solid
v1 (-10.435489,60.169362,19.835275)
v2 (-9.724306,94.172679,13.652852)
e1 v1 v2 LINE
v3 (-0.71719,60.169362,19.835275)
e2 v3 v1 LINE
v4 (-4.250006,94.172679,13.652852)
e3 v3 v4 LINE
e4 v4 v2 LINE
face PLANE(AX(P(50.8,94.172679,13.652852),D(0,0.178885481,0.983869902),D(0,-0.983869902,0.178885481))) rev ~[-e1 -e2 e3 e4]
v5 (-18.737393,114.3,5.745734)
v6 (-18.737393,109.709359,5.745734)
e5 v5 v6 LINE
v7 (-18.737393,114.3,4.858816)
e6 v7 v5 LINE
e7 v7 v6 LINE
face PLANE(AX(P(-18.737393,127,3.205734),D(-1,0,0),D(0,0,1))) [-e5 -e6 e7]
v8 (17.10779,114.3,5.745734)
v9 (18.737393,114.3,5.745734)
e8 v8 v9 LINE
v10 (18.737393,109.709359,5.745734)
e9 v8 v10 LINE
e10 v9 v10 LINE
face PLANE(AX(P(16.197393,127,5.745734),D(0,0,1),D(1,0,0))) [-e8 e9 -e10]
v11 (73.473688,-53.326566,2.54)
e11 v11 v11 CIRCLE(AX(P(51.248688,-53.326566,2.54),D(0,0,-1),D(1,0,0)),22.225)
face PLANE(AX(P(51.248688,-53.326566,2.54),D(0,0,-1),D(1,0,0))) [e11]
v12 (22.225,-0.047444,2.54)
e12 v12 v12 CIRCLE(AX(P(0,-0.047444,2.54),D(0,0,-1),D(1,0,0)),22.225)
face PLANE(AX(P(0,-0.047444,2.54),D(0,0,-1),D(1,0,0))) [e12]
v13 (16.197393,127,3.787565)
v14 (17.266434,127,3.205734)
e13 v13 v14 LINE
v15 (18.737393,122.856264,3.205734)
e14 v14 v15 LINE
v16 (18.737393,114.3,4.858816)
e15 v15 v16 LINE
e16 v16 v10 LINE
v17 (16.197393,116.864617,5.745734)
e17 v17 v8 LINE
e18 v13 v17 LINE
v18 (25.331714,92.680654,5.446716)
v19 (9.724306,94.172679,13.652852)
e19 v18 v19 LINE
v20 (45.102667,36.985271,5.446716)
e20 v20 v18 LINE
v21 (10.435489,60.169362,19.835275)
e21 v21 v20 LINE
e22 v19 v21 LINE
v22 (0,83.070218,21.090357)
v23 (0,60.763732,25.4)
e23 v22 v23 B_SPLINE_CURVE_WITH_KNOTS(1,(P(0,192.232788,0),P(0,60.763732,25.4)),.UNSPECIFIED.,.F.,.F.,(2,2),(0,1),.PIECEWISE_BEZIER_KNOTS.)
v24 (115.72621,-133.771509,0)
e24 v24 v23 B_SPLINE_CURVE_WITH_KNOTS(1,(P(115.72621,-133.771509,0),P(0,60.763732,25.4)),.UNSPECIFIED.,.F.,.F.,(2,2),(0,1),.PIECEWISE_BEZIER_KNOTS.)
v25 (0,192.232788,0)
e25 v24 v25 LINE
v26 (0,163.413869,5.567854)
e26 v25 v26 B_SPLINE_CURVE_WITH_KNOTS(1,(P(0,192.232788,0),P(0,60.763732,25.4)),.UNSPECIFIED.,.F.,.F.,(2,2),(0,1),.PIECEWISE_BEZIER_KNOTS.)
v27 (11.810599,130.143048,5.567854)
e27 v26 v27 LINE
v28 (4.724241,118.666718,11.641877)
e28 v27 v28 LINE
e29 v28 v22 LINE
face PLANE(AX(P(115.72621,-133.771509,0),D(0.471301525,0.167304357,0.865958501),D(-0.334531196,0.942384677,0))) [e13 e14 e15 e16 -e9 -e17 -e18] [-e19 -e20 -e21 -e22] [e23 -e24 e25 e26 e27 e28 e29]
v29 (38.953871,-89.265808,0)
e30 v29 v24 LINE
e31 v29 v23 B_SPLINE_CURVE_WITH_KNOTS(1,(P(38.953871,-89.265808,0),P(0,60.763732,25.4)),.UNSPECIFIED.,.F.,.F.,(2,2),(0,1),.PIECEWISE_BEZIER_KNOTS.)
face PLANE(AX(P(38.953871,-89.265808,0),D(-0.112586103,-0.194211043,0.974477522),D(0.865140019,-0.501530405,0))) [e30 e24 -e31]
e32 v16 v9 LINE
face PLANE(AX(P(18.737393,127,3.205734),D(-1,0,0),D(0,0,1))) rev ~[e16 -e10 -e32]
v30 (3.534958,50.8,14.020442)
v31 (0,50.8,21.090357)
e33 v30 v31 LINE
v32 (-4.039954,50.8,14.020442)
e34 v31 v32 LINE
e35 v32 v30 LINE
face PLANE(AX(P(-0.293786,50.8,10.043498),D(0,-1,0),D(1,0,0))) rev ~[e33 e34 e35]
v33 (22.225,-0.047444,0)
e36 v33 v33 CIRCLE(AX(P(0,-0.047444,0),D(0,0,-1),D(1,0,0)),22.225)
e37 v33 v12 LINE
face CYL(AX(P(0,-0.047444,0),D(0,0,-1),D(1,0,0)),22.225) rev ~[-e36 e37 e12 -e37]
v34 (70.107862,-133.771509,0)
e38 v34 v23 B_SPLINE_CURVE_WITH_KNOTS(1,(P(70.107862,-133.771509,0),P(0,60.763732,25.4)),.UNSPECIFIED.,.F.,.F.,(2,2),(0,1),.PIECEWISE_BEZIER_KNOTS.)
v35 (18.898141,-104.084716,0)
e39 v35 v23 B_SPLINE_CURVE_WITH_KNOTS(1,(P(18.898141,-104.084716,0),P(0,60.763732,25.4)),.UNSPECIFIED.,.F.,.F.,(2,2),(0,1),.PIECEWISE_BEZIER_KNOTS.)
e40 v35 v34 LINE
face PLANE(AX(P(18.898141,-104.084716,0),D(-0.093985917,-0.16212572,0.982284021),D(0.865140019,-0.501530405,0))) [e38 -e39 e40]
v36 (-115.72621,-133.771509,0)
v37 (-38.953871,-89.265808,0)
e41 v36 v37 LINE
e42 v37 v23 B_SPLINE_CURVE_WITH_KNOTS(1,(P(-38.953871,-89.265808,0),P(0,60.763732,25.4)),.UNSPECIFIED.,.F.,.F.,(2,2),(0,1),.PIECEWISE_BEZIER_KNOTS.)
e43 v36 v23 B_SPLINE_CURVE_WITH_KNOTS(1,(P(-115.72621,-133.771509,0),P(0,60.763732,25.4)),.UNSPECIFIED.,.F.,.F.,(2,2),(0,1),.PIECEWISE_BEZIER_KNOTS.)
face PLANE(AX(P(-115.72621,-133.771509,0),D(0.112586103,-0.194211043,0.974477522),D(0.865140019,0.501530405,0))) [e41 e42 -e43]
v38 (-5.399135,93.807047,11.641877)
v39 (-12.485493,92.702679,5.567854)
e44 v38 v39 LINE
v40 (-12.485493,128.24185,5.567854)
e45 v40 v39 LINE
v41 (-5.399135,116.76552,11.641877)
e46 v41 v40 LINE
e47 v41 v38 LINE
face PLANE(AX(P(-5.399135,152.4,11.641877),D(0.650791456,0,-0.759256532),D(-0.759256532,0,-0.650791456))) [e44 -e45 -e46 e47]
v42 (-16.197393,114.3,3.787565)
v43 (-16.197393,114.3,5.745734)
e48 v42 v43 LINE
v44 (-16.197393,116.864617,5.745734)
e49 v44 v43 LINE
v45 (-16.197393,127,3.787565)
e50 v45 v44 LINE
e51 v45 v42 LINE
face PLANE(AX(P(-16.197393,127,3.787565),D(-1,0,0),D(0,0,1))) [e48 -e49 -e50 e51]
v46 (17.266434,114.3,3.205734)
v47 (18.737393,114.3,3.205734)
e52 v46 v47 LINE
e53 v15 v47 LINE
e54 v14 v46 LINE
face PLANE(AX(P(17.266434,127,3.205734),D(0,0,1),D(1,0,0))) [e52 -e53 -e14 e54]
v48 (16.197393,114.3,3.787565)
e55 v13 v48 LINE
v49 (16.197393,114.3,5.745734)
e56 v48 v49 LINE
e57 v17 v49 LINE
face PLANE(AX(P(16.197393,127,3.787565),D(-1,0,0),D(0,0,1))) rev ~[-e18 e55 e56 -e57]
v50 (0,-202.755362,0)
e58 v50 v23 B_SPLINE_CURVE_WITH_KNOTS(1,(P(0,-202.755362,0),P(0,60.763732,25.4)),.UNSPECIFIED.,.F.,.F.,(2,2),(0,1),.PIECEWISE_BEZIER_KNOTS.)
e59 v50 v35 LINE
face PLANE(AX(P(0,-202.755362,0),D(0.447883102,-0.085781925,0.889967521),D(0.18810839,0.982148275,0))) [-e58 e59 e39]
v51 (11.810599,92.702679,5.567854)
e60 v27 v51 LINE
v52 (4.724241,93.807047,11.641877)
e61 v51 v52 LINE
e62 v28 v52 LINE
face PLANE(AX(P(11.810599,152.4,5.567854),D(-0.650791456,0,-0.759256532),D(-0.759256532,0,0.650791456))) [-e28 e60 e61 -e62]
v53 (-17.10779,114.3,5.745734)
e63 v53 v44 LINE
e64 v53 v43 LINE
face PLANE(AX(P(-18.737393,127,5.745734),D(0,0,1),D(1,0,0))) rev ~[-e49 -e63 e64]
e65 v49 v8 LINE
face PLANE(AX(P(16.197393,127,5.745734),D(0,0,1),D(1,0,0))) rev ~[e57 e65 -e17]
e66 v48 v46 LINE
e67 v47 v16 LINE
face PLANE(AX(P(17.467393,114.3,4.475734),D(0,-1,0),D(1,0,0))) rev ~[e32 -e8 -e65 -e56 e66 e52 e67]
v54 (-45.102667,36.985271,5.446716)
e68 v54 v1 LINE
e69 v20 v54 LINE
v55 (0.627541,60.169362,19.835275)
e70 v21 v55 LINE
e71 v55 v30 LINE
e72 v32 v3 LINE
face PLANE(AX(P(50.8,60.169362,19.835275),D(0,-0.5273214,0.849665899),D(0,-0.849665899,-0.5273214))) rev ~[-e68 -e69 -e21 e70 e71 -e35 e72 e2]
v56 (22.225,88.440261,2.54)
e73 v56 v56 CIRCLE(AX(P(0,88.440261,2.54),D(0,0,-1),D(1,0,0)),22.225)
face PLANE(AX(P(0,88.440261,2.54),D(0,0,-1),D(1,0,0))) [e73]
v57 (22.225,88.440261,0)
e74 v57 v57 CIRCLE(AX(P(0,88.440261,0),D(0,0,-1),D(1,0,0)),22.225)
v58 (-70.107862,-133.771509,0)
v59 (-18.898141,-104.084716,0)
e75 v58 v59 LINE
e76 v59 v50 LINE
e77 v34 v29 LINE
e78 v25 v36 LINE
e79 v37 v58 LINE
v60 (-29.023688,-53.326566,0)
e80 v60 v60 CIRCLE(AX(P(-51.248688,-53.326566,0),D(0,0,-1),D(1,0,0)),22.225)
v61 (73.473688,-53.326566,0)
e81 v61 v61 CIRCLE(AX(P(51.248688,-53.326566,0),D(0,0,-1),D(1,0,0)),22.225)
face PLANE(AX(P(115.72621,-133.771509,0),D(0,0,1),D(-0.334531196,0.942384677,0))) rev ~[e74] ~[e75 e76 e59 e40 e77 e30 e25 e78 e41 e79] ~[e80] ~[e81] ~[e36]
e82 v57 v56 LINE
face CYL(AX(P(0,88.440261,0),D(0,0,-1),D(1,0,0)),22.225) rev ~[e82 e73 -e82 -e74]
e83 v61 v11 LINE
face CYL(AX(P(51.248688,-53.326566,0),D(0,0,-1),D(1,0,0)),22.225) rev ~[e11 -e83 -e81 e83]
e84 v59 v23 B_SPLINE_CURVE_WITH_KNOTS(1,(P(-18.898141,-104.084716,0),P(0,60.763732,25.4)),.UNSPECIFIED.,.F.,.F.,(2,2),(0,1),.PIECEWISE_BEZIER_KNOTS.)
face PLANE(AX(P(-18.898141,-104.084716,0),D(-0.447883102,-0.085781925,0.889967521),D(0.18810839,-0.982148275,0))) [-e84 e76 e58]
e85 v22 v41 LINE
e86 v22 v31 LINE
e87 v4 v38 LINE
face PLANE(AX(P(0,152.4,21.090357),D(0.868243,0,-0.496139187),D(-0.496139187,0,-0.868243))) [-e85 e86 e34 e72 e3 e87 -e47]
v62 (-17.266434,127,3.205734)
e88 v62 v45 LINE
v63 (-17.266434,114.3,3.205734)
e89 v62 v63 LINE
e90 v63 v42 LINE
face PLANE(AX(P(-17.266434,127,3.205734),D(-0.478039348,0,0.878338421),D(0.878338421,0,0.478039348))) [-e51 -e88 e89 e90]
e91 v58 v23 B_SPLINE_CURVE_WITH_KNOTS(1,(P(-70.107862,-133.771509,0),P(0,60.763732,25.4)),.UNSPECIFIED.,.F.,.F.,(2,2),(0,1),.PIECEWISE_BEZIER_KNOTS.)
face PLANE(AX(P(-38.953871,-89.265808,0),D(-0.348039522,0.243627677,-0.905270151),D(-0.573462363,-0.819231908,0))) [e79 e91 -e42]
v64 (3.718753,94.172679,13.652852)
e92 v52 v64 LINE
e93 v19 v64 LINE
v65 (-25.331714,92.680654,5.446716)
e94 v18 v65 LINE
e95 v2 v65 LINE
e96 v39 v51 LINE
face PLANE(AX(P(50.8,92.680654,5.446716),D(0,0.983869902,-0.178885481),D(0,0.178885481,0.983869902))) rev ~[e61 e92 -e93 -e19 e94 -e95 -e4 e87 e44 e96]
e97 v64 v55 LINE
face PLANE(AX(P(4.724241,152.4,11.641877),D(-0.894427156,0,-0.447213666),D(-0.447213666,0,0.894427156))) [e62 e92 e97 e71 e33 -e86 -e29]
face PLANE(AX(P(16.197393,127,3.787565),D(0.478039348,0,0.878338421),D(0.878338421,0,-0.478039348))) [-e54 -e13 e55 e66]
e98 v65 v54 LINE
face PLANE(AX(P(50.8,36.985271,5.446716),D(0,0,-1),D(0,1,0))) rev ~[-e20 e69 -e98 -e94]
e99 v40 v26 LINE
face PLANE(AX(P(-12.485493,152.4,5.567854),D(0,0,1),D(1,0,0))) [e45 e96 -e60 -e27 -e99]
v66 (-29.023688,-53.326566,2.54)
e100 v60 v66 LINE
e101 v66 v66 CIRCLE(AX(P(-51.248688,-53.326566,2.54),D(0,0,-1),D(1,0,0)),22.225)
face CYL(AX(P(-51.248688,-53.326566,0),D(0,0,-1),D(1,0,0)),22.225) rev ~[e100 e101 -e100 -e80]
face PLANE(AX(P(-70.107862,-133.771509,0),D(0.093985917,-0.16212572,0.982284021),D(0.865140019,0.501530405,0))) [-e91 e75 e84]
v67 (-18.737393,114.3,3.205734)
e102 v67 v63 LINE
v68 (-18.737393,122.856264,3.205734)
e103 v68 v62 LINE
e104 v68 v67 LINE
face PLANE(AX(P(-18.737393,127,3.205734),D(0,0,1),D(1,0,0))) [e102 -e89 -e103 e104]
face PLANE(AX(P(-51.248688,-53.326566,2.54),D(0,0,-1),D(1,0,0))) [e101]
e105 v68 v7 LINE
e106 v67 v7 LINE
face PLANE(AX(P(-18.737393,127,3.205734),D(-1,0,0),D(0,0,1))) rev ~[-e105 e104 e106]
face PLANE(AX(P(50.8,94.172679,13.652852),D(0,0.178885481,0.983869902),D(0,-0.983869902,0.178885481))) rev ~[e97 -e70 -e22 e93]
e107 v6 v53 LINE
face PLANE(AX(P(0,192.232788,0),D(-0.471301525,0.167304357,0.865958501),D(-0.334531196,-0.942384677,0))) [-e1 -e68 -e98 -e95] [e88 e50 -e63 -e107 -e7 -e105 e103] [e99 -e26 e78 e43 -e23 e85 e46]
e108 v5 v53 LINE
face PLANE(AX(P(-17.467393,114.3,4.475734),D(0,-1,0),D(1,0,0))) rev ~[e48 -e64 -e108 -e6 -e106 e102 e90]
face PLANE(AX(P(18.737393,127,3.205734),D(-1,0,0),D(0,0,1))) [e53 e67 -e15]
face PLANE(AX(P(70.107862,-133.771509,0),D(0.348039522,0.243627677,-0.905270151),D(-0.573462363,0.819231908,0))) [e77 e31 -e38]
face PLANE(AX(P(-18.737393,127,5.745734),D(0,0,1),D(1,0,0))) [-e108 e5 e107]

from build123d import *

# Parameters (mm, degrees)
F6_DEPTH  = 166.5272102769
F9_DEPTH  = 101.6
F10_DEPTH = 39.8337877091
F12_W     = 2.54
F12_H     = 2.54
F13_DEPTH = 25.4
F14_DEPTH = 12.7
F15_R     = 22.225
F16_DEPTH = 2.54


# Not quite as in the source:
# - the program builds the solid bodies; features that only make, move or delete a surface that nothing else refers to are left out


with BuildPart() as f3:
    # F0 (on Top) → F3 section 0
    with BuildSketch(Plane.XY, mode=Mode.PRIVATE) as f3_s0:
        Polygon((115.7262101769, -133.7715089321), (0, 192.2327876091), (-115.7262101769, -133.7715089321), (-38.9538705349, -89.2658084631), (-70.1078623533, -133.7715089321), (-18.8981407312, -104.0847162377), (0, -202.7553617954), (18.8981407312, -104.0847162377), (70.1078623533, -133.7715089321), (38.9538705349, -89.2658084631), align=None)
    loft([f3_s0.sketch, Vertex(0, 60.7637315989, 25.4)])

    # F5 (on offset) → F6 (cut, through all)
    with BuildSketch(Plane.YZ.offset(50.8)):
        Polygon((94.1726788878, 13.6528518051), (60.1693615317, 19.8352746665), (36.985270679, 5.446716453), (92.6806539106, 5.446716453), align=None)
    extrude(amount=-F6_DEPTH, mode=Mode.SUBTRACT)

    # F8 (on offset) → F9 (cut)
    with BuildSketch(Plane.XZ.offset(-152.4)):
        Polygon((-12.4854929745, 5.5678542703), (11.810598895, 5.5678542703), (4.7242408618, 11.641876772), (0, 21.0903566331), (-5.3991349414, 11.641876772), align=None)
    extrude(amount=F9_DEPTH, mode=Mode.SUBTRACT)

    # F10 (cut, through all): a face of the model
    f10_faces = [f3.faces().sort_by_distance(p)[0] for p in [
        (0, 152.4, 6.2771523841),
    ]]
    extrude(f10_faces, amount=-F10_DEPTH, mode=Mode.SUBTRACT)

    # F12 (on offset) → F13 (join)
    with BuildSketch(Plane.XZ.offset(-127)):
        with Locations((17.467392717, 4.4757343051)):
            Rectangle(F12_W, F12_H)
        with Locations((-17.467392717, 4.4757343051)):
            Rectangle(F12_W, F12_H)
    extrude(amount=F13_DEPTH)

    # F14 (cut): faces of the model
    f14_faces = [f3.faces().sort_by_distance(p)[0] for p in [
        (17.5136661011, 127, 4.5302328808),
        (-17.5136661011, 127, 4.5302328808),
    ]]
    extrude(f14_faces, amount=-F14_DEPTH, mode=Mode.SUBTRACT)

    # F15 (on face) → F16 (cut)
    with BuildSketch(Plane(origin=(0, 0, 0), x_dir=(1, 0, 0), z_dir=(0, 0, -1))):
        with Locations((-51.2486876787, 53.3265663744)):
            Circle(F15_R)
        with Locations((51.2486876787, 53.3265663744)):
            Circle(F15_R)
        with Locations((0, 0.0474439003)):
            Circle(F15_R)
        with Locations((0, -88.4402606044)):
            Circle(F15_R)
    extrude(amount=-F16_DEPTH, mode=Mode.SUBTRACT)


solid = f3.part
